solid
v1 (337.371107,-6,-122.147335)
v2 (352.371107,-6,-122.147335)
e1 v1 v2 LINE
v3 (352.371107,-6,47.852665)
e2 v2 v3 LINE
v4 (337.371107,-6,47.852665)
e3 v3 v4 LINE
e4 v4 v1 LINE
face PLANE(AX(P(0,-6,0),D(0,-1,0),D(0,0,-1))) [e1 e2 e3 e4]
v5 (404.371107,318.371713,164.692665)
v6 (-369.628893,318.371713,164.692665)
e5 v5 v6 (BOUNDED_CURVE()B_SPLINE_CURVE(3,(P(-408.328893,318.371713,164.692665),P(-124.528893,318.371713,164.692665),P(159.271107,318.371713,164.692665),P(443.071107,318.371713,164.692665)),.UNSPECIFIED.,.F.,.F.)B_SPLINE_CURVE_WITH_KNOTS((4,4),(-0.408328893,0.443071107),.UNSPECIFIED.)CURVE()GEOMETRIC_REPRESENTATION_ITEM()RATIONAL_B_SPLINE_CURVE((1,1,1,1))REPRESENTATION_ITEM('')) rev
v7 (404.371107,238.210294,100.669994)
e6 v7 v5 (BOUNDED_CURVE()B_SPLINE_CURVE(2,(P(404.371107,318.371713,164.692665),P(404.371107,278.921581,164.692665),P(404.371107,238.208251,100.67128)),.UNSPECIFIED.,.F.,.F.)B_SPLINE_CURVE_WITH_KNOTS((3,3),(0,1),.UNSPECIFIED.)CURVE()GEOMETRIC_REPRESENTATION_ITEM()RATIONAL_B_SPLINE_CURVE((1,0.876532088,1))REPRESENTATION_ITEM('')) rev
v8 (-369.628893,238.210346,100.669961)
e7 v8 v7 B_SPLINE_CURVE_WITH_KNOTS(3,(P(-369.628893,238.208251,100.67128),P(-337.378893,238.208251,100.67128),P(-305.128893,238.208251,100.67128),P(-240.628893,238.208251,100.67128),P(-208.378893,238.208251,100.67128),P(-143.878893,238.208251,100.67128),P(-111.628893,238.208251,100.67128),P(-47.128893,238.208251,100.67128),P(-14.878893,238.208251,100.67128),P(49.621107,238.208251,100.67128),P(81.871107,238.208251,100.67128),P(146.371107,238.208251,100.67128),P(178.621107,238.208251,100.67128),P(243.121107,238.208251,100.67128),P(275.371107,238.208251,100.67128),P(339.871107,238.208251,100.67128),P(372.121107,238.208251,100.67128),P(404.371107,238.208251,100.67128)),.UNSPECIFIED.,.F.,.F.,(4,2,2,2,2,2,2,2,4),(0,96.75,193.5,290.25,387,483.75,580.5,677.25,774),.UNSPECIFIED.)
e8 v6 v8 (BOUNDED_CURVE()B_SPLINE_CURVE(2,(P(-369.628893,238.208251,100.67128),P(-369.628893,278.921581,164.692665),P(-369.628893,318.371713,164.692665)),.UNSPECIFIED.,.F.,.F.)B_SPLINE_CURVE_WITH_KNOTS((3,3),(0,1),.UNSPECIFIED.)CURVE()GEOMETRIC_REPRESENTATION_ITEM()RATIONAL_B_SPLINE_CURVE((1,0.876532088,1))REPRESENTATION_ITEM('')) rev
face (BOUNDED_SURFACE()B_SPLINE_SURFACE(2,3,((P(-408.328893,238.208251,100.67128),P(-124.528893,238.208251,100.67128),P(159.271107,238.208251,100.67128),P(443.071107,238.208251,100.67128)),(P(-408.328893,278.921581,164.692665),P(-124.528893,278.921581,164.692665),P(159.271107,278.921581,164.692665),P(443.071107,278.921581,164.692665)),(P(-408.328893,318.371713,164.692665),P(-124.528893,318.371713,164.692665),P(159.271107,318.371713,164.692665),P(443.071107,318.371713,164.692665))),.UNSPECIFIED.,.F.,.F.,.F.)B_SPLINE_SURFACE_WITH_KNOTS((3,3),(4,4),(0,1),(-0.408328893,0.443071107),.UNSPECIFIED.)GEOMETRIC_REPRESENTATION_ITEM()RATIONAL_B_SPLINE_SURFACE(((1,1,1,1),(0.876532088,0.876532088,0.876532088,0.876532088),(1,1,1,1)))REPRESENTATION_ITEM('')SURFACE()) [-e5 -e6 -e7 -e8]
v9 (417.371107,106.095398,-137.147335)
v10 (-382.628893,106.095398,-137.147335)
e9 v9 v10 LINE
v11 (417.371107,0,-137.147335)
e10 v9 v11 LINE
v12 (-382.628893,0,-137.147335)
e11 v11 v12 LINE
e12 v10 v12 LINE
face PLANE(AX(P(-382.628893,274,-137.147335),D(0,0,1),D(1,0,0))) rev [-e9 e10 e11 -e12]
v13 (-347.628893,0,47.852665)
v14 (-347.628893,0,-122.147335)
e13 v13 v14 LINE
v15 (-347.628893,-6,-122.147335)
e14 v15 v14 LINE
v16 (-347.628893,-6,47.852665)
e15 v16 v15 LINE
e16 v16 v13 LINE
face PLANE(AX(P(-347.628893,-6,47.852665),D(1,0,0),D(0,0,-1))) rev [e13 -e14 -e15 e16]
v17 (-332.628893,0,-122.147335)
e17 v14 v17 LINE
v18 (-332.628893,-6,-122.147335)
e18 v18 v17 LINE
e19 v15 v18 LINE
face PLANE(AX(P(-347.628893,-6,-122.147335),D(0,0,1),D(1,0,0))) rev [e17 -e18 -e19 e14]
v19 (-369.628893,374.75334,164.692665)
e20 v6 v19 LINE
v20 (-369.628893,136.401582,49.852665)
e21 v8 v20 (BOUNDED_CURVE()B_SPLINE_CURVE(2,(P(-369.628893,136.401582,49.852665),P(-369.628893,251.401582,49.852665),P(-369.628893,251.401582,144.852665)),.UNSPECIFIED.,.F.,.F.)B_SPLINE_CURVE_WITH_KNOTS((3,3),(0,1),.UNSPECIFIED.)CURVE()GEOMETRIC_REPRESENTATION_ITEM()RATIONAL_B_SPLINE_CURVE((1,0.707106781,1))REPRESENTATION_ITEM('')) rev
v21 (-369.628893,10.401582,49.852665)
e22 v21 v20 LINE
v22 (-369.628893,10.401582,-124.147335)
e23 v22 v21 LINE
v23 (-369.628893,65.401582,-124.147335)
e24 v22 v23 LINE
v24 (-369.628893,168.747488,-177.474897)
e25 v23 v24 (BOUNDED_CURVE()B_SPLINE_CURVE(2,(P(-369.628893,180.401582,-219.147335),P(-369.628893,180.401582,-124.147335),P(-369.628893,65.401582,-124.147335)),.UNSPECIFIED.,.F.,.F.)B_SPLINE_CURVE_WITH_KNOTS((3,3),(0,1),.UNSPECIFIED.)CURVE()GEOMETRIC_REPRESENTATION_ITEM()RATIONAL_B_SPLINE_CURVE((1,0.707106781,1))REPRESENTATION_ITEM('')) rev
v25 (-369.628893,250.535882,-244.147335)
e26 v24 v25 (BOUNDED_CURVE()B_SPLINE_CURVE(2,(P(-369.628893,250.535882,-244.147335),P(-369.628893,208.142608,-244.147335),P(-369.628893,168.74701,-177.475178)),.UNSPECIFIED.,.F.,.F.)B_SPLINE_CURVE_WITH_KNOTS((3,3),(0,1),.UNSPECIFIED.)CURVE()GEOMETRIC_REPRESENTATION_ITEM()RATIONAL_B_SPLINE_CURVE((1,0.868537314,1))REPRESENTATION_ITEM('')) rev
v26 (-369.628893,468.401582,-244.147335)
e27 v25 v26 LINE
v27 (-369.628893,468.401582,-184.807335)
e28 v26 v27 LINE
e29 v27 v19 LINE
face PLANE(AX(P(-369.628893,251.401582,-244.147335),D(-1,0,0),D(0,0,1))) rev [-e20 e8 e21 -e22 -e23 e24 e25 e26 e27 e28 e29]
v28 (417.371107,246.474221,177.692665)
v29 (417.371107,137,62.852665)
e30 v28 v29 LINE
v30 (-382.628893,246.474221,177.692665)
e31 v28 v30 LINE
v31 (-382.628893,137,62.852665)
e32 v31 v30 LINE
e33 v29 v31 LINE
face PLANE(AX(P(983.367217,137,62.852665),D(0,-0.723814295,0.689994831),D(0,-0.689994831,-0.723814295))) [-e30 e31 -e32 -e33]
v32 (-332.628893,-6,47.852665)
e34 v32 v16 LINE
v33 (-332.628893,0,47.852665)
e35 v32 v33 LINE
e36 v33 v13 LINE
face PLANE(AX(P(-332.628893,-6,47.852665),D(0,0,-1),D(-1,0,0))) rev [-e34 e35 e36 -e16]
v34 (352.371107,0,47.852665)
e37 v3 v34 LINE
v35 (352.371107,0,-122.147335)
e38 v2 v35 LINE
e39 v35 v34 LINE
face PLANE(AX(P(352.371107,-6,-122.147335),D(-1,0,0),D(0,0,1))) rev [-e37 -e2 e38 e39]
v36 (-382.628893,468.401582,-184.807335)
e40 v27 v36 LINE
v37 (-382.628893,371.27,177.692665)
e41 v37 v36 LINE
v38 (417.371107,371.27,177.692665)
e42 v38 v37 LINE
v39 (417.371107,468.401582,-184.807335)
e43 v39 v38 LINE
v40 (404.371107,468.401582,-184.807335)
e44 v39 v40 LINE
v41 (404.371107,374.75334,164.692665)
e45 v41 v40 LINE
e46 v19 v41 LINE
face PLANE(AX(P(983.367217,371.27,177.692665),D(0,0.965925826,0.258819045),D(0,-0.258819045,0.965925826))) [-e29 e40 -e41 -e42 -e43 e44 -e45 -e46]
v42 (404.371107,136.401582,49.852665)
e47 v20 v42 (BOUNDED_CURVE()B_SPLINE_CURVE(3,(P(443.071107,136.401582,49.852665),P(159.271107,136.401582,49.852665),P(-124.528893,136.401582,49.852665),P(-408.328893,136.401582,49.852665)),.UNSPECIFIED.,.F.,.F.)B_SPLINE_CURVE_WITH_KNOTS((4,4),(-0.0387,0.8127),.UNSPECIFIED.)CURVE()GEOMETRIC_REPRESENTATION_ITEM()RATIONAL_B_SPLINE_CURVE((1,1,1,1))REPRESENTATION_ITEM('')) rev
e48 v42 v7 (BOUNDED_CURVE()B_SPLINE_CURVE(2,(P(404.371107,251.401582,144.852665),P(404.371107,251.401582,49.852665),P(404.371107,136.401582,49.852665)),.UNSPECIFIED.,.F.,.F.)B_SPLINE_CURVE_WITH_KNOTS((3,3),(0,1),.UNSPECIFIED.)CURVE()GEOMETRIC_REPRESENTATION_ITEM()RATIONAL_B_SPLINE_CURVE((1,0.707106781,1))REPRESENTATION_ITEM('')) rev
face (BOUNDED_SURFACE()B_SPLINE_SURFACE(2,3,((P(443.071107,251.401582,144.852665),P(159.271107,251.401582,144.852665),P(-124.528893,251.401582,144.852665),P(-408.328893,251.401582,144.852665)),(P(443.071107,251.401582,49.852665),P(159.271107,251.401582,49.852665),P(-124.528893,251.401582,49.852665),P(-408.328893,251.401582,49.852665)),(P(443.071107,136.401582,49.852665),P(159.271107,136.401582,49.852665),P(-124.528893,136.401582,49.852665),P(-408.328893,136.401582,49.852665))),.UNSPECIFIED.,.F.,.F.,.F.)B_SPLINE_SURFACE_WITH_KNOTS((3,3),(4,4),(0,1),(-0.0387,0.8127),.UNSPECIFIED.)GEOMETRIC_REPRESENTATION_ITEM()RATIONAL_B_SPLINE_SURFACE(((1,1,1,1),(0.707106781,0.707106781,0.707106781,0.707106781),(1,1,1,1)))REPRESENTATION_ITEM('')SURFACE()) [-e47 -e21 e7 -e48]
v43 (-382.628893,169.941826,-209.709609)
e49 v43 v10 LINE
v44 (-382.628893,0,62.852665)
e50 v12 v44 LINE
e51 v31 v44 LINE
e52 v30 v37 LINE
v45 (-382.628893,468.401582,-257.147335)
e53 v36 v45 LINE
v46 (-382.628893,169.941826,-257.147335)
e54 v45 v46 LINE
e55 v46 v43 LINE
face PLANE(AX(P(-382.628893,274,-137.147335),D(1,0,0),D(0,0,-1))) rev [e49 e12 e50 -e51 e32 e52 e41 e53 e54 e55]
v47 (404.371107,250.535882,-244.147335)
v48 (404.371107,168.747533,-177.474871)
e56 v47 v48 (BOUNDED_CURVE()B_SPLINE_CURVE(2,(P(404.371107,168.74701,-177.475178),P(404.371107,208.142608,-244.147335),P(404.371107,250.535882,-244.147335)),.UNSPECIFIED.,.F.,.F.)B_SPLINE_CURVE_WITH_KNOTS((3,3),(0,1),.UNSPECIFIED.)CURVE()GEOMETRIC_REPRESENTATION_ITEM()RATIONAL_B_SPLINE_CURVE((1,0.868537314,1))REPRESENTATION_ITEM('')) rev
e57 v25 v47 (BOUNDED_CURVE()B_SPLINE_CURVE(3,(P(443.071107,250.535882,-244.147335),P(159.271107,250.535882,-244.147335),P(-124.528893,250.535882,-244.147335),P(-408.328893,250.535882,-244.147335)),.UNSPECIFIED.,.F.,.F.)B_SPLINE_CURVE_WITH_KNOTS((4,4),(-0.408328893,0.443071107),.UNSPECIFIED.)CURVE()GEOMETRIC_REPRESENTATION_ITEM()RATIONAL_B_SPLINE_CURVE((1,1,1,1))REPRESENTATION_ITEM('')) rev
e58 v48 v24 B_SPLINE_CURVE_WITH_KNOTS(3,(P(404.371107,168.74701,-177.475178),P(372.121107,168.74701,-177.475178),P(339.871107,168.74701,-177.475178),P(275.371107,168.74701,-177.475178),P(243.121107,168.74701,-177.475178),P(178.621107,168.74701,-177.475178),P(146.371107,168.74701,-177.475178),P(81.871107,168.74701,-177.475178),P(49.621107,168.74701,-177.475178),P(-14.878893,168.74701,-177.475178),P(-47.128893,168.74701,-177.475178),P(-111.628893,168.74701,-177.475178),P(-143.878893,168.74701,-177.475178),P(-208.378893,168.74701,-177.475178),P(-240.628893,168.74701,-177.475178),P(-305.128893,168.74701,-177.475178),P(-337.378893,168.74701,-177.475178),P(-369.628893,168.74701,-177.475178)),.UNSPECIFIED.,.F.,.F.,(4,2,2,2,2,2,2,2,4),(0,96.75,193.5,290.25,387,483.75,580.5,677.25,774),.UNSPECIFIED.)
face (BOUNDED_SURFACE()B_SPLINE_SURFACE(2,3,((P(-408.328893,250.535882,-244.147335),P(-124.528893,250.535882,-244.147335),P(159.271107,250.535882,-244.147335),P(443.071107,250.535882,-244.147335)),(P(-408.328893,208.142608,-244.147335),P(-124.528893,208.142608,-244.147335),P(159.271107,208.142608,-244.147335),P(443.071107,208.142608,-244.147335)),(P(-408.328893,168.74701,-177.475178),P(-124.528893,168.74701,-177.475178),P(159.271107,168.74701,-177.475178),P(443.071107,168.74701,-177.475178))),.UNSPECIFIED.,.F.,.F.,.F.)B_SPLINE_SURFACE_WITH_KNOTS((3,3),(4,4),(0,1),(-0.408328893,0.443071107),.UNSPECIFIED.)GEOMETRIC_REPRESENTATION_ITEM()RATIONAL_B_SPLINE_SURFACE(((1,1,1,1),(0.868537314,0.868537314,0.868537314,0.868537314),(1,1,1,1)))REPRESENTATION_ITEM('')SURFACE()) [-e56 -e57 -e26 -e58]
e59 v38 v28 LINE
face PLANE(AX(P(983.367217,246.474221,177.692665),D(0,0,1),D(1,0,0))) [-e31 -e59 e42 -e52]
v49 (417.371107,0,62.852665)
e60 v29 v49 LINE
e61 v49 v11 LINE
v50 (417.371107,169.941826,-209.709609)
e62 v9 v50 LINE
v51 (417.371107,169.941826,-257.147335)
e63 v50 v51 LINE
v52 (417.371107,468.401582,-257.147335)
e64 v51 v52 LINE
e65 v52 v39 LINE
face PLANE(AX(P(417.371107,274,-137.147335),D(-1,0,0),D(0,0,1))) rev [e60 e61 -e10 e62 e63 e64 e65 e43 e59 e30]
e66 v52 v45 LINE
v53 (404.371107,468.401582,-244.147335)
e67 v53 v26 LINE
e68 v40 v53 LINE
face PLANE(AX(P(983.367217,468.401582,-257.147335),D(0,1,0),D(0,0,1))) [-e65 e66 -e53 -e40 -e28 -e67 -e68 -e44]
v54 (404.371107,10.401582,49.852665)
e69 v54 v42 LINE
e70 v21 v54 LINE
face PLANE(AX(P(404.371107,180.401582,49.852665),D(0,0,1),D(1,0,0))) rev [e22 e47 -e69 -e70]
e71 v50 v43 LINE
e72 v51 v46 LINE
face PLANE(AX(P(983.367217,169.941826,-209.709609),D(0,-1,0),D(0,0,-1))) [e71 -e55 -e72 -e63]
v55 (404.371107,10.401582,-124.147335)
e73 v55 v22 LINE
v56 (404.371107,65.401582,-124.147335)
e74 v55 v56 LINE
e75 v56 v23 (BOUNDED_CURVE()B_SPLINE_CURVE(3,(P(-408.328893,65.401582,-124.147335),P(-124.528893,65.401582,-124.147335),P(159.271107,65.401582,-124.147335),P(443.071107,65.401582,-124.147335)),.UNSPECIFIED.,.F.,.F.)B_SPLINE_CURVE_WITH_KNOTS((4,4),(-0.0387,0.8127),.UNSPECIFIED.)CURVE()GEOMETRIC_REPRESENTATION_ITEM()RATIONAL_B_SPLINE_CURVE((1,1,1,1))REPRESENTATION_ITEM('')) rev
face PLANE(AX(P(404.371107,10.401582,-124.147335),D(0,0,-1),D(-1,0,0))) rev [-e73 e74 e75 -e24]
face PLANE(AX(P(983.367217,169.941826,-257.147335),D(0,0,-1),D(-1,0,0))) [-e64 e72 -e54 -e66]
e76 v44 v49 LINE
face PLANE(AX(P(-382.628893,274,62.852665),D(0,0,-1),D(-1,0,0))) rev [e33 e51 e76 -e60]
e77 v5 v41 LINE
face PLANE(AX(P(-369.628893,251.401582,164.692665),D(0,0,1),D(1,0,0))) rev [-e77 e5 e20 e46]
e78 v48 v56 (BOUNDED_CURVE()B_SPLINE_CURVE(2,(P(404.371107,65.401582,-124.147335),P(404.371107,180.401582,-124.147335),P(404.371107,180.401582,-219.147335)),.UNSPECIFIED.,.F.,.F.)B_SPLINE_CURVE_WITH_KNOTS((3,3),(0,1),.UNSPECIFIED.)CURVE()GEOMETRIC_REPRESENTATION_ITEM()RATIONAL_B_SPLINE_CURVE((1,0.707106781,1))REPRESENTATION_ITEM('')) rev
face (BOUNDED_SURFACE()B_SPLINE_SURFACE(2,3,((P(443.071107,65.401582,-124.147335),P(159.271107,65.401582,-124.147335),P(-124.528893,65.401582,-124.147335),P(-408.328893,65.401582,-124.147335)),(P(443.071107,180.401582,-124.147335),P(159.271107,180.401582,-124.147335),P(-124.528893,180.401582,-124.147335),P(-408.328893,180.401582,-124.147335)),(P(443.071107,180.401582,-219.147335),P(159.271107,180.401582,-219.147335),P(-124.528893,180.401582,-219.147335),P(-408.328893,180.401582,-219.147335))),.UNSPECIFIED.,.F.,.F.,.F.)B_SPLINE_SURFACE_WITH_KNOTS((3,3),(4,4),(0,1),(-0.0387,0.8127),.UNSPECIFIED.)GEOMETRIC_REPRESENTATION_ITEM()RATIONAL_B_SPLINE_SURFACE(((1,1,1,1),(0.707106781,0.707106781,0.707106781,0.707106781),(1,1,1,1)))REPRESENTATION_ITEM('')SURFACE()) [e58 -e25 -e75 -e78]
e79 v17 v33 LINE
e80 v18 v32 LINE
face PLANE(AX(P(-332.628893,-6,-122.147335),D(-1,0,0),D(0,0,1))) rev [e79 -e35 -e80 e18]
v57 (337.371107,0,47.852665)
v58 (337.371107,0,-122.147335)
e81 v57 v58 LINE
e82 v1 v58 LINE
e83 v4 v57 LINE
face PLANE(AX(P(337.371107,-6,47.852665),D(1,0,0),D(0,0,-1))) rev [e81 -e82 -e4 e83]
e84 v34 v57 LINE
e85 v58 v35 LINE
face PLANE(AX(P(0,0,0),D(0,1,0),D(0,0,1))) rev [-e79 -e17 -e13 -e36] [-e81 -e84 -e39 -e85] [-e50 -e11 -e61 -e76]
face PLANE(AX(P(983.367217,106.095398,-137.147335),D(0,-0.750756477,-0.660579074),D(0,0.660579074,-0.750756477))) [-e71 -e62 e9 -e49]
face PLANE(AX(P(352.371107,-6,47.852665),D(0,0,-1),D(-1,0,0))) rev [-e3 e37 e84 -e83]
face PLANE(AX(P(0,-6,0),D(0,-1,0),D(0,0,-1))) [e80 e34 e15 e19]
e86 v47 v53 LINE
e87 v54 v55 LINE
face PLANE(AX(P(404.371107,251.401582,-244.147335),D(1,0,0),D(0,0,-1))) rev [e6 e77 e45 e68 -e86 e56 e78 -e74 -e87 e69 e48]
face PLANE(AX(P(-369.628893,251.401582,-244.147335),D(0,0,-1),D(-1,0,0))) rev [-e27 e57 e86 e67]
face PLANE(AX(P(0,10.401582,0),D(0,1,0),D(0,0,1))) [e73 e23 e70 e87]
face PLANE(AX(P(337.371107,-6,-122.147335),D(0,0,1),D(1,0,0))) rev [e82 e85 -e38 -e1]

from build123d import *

# Parameters (mm, degrees)
SKIZZE1_W                       = 800
SKIZZE1_H                       = 200
AUFSATZ_LINEAR_AUSTRAGEN1_DEPTH = 274
SKIZZE2_W                       = 15
SKIZZE2_H                       = 170
AUFSATZ_LINEAR_AUSTRAGEN2_DEPTH = 6
AUFSATZ_LINEAR_AUSTRAGEN4_DEPTH = 800
SKIZZE8_W                       = 774
SKIZZE8_H                       = 408.84
SCHNITT_LINEAR_AUSTRAGEN3_DEPTH = 217
SKIZZE9_W                       = 774
SKIZZE9_H                       = 294
SCHNITT_LINEAR_AUSTRAGEN4_DEPTH = 71
SKIZZE10_W                      = 774
SKIZZE10_H                      = 174
SCHNITT_LINEAR_AUSTRAGEN5_DEPTH = 170
VERRUNDUNG1_SIZE                = 115
VERRUNDUNG1_SIZE_2              = 95
VERRUNDUNG2_SIZE                = 95
VERRUNDUNG2_SIZE_2              = 115
VERRUNDUNG3_START               = -371
VERRUNDUNG3_DEPTH               = 776


with BuildPart() as part:
    # Skizze1 → Aufsatz-Linear austragen1 (new body)
    with BuildSketch(Plane(origin=(0, 0, 0), x_dir=(1, 0, 0), z_dir=(0, 1, 0))):
        with Locations((17.371106882, 37.147335423)):
            Rectangle(SKIZZE1_W, SKIZZE1_H)
    extrude(amount=AUFSATZ_LINEAR_AUSTRAGEN1_DEPTH)

    # Skizze2 → Aufsatz-Linear austragen2 (add)
    with BuildSketch(Plane(origin=(0, 0, 0), x_dir=(-1, 0, 0), z_dir=(0, -1, 0))):
        with Locations((340.128893118, 37.147335423)):
            Rectangle(SKIZZE2_W, SKIZZE2_H)
        with Locations((-344.871106882, 37.147335423)):
            Rectangle(SKIZZE2_W, SKIZZE2_H)
    extrude(amount=AUFSATZ_LINEAR_AUSTRAGEN2_DEPTH)

    # Skizze7 → Aufsatz-Linear austragen4 (add)
    with BuildSketch(Plane.ZY.offset(382.628893118)):
        Polygon((-137.147335423, 106.095397632), (-209.709609496, 169.941826261), (-257.147335423, 169.941826261), (-257.147335423, 468.401582256), (-184.807335423, 468.401582256), (177.692664577, 371.27), (177.692664577, 246.474221491), (62.852664577, 137), align=None)
    extrude(amount=-AUFSATZ_LINEAR_AUSTRAGEN4_DEPTH)

    # Skizze8 → Schnitt-Linear austragen3 (cut)
    with BuildSketch(Plane(origin=(0, 468.401582256, 0), x_dir=(1, 0, 0), z_dir=(0, 1, 0))):
        with Locations((17.371106882, 39.727335423)):
            Rectangle(SKIZZE8_W, SKIZZE8_H)
    extrude(amount=-SCHNITT_LINEAR_AUSTRAGEN3_DEPTH, mode=Mode.SUBTRACT)

    # Skizze9 → Schnitt-Linear austragen4 (cut)
    with BuildSketch(Plane(origin=(0, 251.401582256, 0), x_dir=(1, 0, 0), z_dir=(0, 1, 0))):
        with Locations((17.371106882, 97.147335423)):
            Rectangle(SKIZZE9_W, SKIZZE9_H)
    extrude(amount=-SCHNITT_LINEAR_AUSTRAGEN4_DEPTH, mode=Mode.SUBTRACT)

    # Skizze10 → Schnitt-Linear austragen5 (cut)
    with BuildSketch(Plane(origin=(0, 180.401582256, 0), x_dir=(1, 0, 0), z_dir=(0, 1, 0))):
        with Locations((17.371106882, 37.147335423)):
            Rectangle(SKIZZE10_W, SKIZZE10_H)
    extrude(amount=-SCHNITT_LINEAR_AUSTRAGEN5_DEPTH, mode=Mode.SUBTRACT)

    # Verrundung1
    # a fillet whose section is not a circle: 115, 95 mm, written as the material it takes off along each edge
    with BuildSketch(Plane(origin=(-369.628893118, 180.401582256, -124.147335423), x_dir=(0, -1, 0), z_dir=(1, 0, 0))) as verrundung1_piece_1:
        with BuildLine():
            Bezier((VERRUNDUNG1_SIZE, 0), (0, 0), (0, VERRUNDUNG1_SIZE_2), weights=[1, 0.707106781, 1])
            Line((0, VERRUNDUNG1_SIZE_2), (0, 0))
            Line((0, 0), (VERRUNDUNG1_SIZE, 0))
        make_face()
    extrude(amount=774, mode=Mode.SUBTRACT)

    # Verrundung2
    # a fillet whose section is not a circle: 115, 95 mm, written as the material it takes off along each edge
    with BuildSketch(Plane(origin=(-369.628893118, 251.401582256, 49.852664577), x_dir=(0, 0, 1), z_dir=(1, 0, 0))) as verrundung2_piece_1:
        with BuildLine():
            Bezier((VERRUNDUNG2_SIZE, 0), (0, 0), (0, VERRUNDUNG2_SIZE_2), weights=[1, 0.707106781, 1])
            Line((0, VERRUNDUNG2_SIZE_2), (0, 0))
            Line((0, 0), (VERRUNDUNG2_SIZE, 0))
        make_face()
    extrude(amount=774, mode=Mode.SUBTRACT)

    # Verrundung3: read off the stored shape, not the designer's step
    # Verrundung3 outline → Verrundung3 (add)
    with BuildSketch(Plane.YZ.offset(VERRUNDUNG3_START)):
        with BuildLine():
            add(Edge.make_bspline(
                [(251.401582257, 144.852664577), (251.401582257, 121.417687853), (238.208250652, 100.671279991)],
                knots=[0, 0, 0, 0.316521674, 0.316521674, 0.316521674], degree=2, weights=[1, 0.907292948, 0.873273479]))
            add(Edge.make_bspline(
                [(238.208250652, 100.671279991), (278.921580984, 164.69266458), (318.371713455, 164.692664577)],
                knots=[0, 0, 0, 1, 1, 1], degree=2, weights=[1, 0.876532088, 1]))
            Line((318.371713455, 164.692664577), (251.401582251, 164.692664573))
            Line((251.401582251, 164.692664573), (251.401582257, 144.852664577))
        make_face()
        with BuildLine():
            Line((180.401582251, -244.147335419), (250.535882306, -244.147335423))
            add(Edge.make_bspline(
                [(250.535882306, -244.147335423), (208.142607951, -244.147335414), (168.747010016, -177.475177999)],
                knots=[0, 0, 0, 1, 1, 1], degree=2, weights=[1, 0.868537314, 1]))
            add(Edge.make_bspline(
                [(168.747010016, -177.475177999), (180.401582257, -197.199094267), (180.401582257, -219.147335423)],
                knots=[0.70180493, 0.70180493, 0.70180493, 1, 1, 1], degree=2, weights=[0.877409678, 0.912660686, 1]))
            Line((180.401582257, -219.147335423), (180.401582251, -244.147335419))
        make_face()
    extrude(amount=VERRUNDUNG3_DEPTH)


solid = part.part
